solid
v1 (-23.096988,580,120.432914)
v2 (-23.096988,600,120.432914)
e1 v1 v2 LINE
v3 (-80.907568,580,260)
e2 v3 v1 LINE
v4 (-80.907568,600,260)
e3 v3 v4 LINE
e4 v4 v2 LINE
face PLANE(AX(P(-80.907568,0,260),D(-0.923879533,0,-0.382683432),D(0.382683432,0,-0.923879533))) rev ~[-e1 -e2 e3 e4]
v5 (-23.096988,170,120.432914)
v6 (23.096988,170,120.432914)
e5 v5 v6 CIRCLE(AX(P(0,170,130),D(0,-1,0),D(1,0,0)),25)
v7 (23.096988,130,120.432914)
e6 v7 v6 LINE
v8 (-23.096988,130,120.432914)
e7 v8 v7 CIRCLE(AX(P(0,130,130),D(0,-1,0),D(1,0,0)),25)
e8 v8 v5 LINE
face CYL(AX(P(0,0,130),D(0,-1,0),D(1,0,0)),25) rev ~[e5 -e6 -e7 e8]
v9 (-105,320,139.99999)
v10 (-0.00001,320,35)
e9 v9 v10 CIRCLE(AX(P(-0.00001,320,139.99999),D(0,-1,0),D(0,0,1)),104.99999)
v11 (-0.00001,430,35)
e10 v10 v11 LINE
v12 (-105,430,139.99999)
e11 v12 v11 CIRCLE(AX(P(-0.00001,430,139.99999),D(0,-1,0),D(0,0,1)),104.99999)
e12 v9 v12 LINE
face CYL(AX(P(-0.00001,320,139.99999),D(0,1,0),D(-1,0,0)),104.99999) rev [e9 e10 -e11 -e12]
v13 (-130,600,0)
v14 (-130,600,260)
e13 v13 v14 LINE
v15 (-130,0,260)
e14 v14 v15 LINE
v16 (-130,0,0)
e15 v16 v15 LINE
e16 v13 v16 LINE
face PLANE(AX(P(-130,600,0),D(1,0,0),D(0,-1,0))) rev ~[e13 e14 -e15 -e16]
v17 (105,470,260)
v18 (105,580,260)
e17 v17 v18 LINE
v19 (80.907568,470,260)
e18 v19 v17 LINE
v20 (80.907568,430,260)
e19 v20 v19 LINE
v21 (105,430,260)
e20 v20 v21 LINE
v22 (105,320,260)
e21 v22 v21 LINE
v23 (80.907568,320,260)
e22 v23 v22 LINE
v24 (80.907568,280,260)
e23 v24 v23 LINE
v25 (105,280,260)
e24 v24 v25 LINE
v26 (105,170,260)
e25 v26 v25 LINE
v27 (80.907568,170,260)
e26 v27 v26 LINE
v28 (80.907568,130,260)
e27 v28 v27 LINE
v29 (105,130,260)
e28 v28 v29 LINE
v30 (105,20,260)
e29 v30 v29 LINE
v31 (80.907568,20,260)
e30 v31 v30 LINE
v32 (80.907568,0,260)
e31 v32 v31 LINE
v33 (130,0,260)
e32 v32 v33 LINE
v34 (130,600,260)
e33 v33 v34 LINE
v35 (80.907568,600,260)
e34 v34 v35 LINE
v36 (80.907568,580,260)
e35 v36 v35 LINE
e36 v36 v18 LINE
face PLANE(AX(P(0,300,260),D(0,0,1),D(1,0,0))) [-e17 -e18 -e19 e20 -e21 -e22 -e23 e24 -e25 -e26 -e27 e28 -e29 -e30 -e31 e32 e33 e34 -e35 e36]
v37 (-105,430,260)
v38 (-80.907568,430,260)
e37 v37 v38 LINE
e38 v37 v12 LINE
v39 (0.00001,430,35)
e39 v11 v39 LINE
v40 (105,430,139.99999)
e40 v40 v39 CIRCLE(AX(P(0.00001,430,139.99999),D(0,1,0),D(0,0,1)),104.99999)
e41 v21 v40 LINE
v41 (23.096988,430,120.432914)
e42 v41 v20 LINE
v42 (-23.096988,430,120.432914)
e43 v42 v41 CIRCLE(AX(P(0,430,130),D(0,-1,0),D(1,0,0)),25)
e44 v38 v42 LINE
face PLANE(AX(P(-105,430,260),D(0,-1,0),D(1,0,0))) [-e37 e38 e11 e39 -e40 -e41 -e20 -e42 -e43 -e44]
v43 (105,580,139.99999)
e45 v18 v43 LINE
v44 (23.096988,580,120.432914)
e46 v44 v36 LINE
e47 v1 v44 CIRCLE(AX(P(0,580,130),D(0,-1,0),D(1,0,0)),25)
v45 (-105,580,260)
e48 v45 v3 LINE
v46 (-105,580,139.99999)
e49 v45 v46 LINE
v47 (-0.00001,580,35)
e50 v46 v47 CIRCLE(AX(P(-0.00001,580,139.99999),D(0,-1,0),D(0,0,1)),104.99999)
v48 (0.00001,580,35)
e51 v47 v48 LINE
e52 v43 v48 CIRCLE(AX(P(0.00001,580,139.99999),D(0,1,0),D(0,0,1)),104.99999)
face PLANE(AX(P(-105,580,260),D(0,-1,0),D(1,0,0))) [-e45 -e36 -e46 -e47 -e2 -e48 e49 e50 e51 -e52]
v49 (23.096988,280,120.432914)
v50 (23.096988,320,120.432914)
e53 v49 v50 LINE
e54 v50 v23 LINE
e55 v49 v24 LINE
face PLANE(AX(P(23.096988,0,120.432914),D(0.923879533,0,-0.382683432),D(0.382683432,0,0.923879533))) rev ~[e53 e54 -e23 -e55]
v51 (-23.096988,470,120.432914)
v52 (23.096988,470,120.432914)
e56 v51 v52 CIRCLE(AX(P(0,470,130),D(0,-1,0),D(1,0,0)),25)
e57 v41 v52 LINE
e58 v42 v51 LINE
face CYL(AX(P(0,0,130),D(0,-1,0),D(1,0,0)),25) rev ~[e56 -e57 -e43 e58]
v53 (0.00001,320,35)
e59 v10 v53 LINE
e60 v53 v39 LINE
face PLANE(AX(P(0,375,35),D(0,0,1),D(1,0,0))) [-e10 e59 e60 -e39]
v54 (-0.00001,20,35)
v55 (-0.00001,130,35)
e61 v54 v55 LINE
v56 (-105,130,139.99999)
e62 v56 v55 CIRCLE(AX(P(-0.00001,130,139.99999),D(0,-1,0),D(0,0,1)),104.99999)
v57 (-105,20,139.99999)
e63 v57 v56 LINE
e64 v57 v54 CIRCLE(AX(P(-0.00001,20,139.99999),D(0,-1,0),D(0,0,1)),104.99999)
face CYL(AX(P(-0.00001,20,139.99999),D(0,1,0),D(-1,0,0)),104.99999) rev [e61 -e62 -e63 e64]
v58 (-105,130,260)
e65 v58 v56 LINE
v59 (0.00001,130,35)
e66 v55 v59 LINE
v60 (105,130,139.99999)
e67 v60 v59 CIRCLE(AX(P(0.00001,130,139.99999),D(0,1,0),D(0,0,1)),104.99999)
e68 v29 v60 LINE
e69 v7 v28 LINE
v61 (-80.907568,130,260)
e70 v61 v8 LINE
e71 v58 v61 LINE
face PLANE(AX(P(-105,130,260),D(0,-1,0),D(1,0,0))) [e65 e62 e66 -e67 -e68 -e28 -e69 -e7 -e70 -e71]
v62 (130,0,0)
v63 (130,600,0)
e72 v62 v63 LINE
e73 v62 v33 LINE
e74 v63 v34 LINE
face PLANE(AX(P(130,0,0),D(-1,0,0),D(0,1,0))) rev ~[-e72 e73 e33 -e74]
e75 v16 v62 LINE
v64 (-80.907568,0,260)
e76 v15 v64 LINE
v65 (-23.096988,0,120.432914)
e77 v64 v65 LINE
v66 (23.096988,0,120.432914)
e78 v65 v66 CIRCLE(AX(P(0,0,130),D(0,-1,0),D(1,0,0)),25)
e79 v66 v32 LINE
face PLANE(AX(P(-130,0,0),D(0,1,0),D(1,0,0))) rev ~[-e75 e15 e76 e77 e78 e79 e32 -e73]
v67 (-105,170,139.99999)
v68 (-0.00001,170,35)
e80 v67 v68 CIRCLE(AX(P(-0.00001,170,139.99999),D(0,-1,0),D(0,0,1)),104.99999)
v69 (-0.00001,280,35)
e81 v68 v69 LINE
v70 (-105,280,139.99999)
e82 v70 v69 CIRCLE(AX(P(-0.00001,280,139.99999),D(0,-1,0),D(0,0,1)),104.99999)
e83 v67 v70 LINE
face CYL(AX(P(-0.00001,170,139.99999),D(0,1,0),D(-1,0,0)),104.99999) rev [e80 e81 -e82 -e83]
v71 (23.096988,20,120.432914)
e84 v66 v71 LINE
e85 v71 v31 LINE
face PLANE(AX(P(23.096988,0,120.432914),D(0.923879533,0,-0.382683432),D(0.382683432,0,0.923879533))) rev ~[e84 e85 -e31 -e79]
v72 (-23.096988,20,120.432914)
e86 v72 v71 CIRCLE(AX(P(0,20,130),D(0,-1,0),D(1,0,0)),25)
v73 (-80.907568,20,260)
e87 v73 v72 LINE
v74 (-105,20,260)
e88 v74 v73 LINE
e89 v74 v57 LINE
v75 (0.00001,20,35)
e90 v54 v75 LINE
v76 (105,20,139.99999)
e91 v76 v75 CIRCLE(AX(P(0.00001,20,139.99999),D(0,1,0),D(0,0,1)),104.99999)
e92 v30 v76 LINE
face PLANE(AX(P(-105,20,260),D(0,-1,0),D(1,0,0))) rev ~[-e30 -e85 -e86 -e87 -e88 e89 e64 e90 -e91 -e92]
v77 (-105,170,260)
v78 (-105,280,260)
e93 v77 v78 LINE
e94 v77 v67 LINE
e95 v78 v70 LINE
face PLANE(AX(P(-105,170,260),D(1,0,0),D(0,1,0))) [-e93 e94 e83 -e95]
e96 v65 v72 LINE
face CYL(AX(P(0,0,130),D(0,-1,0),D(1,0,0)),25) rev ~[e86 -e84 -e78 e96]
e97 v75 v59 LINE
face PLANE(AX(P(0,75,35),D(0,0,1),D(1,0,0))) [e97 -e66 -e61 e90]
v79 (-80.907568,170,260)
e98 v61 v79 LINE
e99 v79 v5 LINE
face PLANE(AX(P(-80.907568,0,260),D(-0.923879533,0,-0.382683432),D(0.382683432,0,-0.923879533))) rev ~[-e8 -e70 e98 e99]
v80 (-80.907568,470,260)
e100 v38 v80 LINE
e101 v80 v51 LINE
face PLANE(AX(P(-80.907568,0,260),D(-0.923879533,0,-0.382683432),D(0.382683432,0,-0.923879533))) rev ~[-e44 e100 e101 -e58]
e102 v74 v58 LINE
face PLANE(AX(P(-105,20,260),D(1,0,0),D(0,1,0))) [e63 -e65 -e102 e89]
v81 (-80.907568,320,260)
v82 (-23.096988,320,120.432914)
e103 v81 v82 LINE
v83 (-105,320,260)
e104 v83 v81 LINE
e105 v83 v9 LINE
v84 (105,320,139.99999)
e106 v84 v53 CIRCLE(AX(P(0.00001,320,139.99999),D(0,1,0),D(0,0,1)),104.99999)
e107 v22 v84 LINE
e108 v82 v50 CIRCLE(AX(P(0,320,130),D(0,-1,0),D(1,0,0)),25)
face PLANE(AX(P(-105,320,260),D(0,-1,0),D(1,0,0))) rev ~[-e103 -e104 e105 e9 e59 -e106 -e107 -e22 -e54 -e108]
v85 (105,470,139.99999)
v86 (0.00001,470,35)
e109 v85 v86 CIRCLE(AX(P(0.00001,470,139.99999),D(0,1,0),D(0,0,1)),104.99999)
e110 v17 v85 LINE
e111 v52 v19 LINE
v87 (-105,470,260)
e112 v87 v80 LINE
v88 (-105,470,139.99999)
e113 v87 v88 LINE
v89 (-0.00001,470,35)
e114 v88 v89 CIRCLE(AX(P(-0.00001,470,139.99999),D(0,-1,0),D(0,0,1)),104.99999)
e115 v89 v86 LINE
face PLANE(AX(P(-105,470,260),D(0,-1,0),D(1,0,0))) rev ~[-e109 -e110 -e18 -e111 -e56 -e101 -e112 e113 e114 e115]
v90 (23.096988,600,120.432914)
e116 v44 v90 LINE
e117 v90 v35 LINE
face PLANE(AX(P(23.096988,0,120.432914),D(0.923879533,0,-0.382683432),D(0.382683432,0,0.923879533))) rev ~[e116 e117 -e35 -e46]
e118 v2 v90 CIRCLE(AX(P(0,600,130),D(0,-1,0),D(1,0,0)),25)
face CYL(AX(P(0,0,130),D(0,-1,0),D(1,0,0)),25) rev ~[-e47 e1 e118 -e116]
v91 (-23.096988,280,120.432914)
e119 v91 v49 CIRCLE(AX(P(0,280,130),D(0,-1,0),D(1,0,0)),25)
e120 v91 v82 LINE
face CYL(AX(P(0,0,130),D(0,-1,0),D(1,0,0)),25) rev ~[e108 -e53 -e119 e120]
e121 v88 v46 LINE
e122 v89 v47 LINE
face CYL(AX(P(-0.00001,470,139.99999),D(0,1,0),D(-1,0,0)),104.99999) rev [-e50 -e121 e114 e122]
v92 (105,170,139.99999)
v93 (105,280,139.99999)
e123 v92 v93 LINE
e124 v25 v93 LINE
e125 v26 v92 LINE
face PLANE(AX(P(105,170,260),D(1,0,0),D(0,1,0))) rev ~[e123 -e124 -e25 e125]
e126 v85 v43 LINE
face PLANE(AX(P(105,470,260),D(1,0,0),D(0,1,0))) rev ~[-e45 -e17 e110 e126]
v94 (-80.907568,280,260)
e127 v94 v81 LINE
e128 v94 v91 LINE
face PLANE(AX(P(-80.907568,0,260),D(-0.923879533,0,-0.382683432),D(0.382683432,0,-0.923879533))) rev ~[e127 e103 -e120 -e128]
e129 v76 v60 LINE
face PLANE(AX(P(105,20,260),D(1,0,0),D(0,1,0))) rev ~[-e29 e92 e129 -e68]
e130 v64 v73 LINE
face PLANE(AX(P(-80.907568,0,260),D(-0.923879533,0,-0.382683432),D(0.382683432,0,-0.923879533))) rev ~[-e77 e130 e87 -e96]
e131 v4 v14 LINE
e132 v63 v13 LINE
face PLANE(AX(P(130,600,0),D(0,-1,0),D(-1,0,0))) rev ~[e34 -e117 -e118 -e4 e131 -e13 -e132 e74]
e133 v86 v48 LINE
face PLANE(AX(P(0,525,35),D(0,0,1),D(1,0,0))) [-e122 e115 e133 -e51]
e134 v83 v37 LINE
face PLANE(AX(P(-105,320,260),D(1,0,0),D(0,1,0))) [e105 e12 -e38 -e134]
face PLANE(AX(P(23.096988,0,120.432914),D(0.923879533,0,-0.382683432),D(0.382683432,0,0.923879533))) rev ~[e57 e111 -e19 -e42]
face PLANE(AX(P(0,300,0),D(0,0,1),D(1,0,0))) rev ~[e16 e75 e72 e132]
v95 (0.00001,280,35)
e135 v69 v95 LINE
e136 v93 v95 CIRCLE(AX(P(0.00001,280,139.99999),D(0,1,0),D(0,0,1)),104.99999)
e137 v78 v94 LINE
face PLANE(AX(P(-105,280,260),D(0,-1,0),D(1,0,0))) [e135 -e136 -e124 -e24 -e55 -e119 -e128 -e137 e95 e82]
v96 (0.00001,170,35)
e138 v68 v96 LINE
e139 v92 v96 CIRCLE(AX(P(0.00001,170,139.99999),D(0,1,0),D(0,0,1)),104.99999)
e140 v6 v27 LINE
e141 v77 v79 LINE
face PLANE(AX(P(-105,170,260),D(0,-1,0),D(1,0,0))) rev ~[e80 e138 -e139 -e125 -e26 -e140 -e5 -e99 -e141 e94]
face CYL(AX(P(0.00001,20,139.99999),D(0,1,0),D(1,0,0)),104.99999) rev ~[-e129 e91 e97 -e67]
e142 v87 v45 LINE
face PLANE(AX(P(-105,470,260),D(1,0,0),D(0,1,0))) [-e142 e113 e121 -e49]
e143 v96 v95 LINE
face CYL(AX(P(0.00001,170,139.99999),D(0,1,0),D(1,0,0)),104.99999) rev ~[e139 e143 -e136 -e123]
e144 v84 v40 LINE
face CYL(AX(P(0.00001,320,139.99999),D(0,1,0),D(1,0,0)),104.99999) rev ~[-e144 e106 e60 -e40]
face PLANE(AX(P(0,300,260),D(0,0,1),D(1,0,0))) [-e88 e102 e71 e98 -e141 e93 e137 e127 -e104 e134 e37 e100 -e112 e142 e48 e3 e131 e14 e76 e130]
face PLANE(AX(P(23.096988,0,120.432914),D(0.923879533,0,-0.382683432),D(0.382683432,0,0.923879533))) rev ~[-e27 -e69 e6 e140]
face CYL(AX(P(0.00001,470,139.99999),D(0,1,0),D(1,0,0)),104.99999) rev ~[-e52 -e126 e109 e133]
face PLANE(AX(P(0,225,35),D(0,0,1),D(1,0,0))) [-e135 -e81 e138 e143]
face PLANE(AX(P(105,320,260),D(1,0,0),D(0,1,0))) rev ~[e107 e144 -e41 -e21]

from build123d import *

# Parameters (mm, degrees)
F1_DEPTH = 260
F2_W     = 210
F2_H     = 110
F3_DEPTH = 225
F4_R     = 104.99999
F6_DEPTH = 600.001


# Not quite as in the source:
# - a fillet or chamfer is up to 0.001 mm smaller than in the source, because OpenCascade refuses the exact size


with BuildPart() as f1:
    # F0 (on Top) → F1 (new body)
    with BuildSketch(Plane.XY):
        Polygon((-130, 0), (0, 0), (130, 0), (130, 600), (-130, 600), align=None)
    extrude(amount=F1_DEPTH)

    # F2 (on face) → F3 (cut)
    with BuildSketch(Plane.XY.offset(260)):
        with Locations((0, 525)):
            Rectangle(F2_W, F2_H)
        with Locations((0, 225)):
            Rectangle(F2_W, F2_H)
        with Locations((0, 375)):
            Rectangle(F2_W, F2_H)
        with Locations((0, 75)):
            Rectangle(F2_W, F2_H)
    extrude(amount=-F3_DEPTH, mode=Mode.SUBTRACT)

    # F4 (radius 105 in the source; OpenCascade refuses exactly that, so slightly less here)
    f4_edges = [f1.edges().sort_by_distance(p)[0] for p in [
        (-105, 75, 35),
        (105, 75, 35),
        (-105, 225, 35),
        (-105, 375, 35),
        (-105, 525, 35),
        (105, 225, 35),
        (105, 375, 35),
        (105, 525, 35),
    ]]
    fillet(f4_edges, radius=F4_R)

    # F5 (on face) → F6 (cut, through all)
    with BuildSketch(Plane.XZ):
        with BuildLine():
            ThreePointArc((23.0969883128, 120.4329141909), (24.5196320101, 125.1227419496), (25, 130))
            ThreePointArc((25, 130), (-4.8772580504, 154.5196320101), (-23.0969883128, 120.4329141909))
            ThreePointArc((-23.0969883128, 120.4329141909), (0, 105), (23.0969883128, 120.4329141909))
        make_face()
        with BuildLine():
            ThreePointArc((-23.0969883128, 120.4329141909), (-4.8772580504, 154.5196320101), (25, 130))
            ThreePointArc((25, 130), (24.5196320101, 125.1227419496), (23.0969883128, 120.4329141909))
            Line((23.0969883128, 120.4329141909), (80.9075681158, 260))
            Line((80.9075681158, 260), (0, 260))
            Line((0, 260), (-80.9075681158, 260))
            Line((-80.9075681158, 260), (-23.0969883128, 120.4329141909))
        make_face()
    extrude(amount=-F6_DEPTH, mode=Mode.SUBTRACT)


solid = f1.part
